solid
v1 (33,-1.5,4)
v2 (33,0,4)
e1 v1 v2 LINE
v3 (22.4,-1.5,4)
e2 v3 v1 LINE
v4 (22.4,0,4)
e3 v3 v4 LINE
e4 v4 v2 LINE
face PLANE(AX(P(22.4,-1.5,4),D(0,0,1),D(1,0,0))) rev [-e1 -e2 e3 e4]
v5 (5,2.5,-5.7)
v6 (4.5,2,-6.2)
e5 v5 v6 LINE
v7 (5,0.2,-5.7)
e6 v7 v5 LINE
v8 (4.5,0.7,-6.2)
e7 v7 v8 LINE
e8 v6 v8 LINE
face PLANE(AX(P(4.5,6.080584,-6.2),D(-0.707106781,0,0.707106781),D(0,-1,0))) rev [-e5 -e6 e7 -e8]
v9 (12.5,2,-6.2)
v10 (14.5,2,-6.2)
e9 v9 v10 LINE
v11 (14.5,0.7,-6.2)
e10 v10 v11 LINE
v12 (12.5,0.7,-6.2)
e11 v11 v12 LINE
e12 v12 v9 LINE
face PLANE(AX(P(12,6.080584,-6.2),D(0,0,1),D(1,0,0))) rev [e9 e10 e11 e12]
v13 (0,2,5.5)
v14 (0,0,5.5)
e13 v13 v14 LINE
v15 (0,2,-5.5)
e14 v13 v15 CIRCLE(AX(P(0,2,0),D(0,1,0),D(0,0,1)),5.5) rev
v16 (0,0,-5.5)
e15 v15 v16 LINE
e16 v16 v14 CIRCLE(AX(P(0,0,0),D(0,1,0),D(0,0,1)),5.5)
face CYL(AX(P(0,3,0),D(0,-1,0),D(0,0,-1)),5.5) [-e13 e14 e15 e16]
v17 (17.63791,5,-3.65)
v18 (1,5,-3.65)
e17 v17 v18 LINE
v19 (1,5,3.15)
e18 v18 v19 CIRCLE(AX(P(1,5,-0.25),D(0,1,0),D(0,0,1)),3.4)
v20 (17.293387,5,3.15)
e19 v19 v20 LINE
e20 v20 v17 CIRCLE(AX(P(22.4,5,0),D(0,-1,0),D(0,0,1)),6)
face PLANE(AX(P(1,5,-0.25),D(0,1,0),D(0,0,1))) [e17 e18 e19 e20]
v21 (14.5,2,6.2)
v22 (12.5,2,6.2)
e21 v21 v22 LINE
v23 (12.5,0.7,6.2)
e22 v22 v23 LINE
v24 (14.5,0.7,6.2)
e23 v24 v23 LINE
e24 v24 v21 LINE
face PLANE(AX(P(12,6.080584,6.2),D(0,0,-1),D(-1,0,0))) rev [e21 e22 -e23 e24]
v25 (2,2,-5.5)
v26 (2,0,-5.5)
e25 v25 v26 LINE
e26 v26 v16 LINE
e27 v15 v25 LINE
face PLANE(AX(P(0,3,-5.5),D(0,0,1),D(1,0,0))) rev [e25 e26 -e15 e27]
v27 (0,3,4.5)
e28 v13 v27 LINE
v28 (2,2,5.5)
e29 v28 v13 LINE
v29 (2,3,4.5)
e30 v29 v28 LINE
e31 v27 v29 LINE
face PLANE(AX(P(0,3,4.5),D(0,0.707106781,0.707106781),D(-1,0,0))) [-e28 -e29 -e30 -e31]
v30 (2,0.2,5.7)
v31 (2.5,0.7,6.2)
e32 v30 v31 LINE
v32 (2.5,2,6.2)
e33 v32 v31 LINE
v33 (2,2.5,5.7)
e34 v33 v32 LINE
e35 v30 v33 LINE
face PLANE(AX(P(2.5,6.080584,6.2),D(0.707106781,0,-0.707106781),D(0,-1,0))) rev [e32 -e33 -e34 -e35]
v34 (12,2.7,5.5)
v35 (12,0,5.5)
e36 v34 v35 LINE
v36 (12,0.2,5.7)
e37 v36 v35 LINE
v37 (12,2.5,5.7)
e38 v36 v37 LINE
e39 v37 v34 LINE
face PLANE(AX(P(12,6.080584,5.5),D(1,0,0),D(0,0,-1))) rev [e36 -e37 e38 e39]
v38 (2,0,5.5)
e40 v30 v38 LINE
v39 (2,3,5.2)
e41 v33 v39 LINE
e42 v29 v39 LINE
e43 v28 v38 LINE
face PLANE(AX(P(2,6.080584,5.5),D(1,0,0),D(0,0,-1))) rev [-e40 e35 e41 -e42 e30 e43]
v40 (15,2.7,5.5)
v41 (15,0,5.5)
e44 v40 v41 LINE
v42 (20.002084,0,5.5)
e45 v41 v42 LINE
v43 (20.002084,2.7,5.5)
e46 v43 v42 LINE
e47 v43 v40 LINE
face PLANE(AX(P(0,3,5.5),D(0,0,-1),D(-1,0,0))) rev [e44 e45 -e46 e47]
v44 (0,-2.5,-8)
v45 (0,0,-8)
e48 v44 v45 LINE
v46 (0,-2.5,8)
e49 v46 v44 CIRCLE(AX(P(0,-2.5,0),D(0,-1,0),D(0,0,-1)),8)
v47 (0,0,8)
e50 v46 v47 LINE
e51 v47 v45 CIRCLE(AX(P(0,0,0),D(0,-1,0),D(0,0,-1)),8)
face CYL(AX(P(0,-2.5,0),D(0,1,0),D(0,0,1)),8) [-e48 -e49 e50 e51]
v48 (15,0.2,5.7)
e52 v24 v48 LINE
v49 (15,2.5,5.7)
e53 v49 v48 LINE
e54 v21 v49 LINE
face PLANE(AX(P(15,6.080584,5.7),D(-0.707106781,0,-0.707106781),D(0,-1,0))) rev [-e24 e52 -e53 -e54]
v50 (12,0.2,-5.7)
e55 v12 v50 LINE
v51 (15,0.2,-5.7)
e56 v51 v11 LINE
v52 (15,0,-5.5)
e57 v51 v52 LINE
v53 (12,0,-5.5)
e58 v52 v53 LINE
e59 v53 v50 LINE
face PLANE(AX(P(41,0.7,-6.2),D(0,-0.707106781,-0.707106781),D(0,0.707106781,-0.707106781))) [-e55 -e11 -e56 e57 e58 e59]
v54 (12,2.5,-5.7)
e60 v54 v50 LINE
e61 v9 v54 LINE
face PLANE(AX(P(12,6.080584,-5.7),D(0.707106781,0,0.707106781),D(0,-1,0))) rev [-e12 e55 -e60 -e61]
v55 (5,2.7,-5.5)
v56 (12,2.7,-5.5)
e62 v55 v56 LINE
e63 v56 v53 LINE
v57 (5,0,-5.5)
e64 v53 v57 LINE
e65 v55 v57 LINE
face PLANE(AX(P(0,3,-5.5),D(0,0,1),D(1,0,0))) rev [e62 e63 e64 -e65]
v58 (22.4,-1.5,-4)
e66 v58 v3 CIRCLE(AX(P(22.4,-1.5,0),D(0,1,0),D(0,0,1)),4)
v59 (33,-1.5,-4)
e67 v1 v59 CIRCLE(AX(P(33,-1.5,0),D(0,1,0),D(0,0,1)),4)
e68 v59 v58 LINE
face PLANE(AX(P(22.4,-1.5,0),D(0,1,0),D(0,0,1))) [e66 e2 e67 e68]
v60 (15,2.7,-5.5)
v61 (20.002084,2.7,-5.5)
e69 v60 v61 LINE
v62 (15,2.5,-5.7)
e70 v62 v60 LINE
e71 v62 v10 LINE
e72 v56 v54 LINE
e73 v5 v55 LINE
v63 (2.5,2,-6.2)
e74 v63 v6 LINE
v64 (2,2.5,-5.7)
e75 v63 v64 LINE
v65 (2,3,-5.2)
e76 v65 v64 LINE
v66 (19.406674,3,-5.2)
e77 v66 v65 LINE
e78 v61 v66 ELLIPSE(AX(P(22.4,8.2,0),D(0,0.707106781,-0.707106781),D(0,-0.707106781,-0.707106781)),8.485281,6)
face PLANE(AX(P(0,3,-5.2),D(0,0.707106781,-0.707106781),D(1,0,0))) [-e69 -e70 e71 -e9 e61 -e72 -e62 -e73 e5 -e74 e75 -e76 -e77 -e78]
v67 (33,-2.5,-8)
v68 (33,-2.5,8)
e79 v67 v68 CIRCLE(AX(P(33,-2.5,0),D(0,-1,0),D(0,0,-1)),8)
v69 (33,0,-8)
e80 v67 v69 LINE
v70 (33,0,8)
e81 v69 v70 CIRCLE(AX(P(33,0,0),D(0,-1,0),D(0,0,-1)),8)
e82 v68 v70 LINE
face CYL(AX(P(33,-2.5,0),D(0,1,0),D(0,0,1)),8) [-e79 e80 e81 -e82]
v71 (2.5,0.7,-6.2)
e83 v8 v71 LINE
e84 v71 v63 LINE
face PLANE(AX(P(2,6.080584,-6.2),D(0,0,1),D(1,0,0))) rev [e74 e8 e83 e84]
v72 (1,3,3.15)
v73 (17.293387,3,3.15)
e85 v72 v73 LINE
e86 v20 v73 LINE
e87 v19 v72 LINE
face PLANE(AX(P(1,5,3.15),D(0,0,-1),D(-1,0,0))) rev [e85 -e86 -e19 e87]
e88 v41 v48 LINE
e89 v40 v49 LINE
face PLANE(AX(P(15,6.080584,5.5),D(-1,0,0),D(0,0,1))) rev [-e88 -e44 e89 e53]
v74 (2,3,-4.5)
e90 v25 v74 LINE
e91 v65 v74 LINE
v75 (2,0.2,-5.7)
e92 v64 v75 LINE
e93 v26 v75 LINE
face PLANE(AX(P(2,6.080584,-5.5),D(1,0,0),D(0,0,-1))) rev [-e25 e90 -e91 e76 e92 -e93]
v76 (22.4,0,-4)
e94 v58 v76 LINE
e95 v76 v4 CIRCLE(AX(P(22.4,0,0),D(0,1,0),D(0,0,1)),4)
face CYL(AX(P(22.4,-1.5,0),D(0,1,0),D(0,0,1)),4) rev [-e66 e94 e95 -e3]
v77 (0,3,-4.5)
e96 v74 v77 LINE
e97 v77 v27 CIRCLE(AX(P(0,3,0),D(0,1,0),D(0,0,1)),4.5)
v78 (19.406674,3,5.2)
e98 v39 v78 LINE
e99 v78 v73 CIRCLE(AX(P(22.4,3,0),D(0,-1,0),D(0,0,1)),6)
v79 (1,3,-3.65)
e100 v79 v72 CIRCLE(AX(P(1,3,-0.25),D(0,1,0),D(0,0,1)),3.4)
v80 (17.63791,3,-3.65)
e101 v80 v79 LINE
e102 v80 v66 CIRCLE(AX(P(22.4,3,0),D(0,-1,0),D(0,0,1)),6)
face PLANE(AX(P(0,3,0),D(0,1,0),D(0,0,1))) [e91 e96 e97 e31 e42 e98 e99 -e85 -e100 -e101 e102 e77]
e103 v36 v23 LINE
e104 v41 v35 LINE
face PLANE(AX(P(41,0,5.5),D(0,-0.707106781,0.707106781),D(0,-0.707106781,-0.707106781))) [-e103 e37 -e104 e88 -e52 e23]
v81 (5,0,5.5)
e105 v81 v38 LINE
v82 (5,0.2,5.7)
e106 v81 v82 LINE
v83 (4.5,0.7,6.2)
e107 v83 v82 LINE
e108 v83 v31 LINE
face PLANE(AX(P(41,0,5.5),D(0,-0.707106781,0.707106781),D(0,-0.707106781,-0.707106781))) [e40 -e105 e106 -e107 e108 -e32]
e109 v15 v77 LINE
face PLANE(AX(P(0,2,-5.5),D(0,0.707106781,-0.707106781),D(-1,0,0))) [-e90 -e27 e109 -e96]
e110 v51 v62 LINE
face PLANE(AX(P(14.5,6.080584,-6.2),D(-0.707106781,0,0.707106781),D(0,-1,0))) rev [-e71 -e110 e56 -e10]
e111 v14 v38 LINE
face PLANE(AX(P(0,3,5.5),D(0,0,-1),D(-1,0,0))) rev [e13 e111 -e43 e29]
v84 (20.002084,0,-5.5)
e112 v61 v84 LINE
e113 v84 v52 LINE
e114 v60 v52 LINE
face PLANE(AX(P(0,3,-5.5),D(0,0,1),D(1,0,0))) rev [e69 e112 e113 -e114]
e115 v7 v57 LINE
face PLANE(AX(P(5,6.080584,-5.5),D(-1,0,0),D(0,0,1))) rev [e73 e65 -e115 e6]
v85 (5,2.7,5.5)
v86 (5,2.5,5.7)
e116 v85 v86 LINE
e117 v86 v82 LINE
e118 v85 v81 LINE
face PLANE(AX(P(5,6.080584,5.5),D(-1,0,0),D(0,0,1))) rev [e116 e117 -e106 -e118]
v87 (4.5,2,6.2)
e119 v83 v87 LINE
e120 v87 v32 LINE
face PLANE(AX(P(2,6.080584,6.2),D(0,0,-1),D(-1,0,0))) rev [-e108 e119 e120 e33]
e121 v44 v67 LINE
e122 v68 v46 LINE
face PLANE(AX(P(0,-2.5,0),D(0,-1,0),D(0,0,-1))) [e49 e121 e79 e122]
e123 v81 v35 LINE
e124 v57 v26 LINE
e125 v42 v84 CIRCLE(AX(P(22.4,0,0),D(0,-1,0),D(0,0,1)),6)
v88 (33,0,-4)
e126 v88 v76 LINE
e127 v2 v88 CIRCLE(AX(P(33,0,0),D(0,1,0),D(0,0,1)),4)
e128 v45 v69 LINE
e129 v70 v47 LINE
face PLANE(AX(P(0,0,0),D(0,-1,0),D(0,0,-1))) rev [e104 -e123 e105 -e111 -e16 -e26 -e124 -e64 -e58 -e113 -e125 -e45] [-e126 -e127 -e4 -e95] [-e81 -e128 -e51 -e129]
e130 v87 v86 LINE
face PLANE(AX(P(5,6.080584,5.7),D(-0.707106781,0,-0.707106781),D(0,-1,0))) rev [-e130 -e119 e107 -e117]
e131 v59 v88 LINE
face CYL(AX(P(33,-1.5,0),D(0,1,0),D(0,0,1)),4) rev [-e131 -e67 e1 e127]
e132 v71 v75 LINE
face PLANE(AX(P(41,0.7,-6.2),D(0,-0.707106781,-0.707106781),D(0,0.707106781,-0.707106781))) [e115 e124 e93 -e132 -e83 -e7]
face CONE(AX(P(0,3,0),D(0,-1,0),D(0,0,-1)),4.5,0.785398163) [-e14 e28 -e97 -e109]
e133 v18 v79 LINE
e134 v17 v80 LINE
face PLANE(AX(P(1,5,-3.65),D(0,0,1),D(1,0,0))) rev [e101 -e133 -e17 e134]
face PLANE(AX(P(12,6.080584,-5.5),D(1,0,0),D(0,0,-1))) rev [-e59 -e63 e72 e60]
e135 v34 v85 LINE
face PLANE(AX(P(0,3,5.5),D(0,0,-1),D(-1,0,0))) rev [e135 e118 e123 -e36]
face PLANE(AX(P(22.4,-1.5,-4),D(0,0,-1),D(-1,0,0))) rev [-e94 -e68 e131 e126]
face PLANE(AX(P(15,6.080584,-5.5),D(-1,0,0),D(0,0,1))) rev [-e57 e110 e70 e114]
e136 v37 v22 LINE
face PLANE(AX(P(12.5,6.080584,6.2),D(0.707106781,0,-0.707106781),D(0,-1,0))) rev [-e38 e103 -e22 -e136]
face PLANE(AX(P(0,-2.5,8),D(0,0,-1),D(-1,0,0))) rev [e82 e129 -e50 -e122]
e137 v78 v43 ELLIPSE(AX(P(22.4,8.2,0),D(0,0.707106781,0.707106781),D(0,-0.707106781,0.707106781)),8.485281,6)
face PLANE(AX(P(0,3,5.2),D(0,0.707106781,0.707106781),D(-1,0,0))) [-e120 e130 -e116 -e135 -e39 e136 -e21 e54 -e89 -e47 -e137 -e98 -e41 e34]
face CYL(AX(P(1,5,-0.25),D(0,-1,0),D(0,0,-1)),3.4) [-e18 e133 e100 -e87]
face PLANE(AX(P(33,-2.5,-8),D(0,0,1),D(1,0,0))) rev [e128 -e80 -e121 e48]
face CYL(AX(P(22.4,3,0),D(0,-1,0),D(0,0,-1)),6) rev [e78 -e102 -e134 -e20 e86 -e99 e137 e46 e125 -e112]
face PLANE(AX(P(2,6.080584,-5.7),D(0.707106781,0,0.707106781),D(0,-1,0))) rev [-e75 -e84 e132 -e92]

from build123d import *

# Parameters (mm, degrees)
EXTRUDE_1_DEPTH          = 3
EXTRUDE_2_DEPTH          = 2.5
CUT_EXTRUDE_1_DEPTH      = 1.5
EXTRUDE_3_DEPTH          = 2
SKETCH_5_W               = 3
SKETCH_5_H               = 0.7
EXTRUDE_4_DEPTH          = 3
CHAMFER_1_SIZE           = 1
CHAMFER_START            = -5.499796234
CHAMFER_2_DEPTH          = 7.499796234
CHAMFER_2_2_ANGLE        = 180
CHAMFER_3_SIZE           = 0.5
CUT_EXTRUDE_2_DEPTH      = 43.071367936
CUT_EXTRUDE_2_DEPTH_BACK = 43.071367936


with BuildPart() as part:
    # 草图1 → 凸台-拉伸1 (new body)
    with BuildSketch(Plane(origin=(0, 0, 0), x_dir=(1, 0, 0), z_dir=(0, 1, 0))):
        with BuildLine():
            Line((0, 5.5), (20.002084238, 5.5))
            ThreePointArc((20.002084238, 5.5), (16.4, 0), (20.002084238, -5.5))
            Line((20.002084238, -5.5), (0, -5.5))
            ThreePointArc((0, -5.5), (-5.5, 0), (0, 5.5))
        make_face()
    extrude(amount=EXTRUDE_1_DEPTH)

    # 草图2 → 凸台-拉伸2 (add)
    with BuildSketch(Plane.XZ):
        with BuildLine():
            Line((0, 8), (33, 8))
            ThreePointArc((33, 8), (41, 0), (33, -8))
            Line((33, -8), (0, -8))
            ThreePointArc((0, -8), (-8, 0), (0, 8))
        make_face()
    extrude(amount=EXTRUDE_2_DEPTH)

    # 草图3 → 切除-拉伸1 (cut)
    with BuildSketch(Plane(origin=(0, 0, 0), x_dir=(1, 0, 0), z_dir=(0, 1, 0))):
        with BuildLine():
            Line((22.4, 4), (33, 4))
            ThreePointArc((33, 4), (37, 0), (33, -4))
            Line((33, -4), (22.4, -4))
            ThreePointArc((22.4, -4), (18.4, 0), (22.4, 4))
        make_face()
    extrude(amount=-CUT_EXTRUDE_1_DEPTH, mode=Mode.SUBTRACT)

    # 草图4 → 凸台-拉伸3 (add)
    with BuildSketch(Plane(origin=(0, 3, 0), x_dir=(1, 0, 0), z_dir=(0, 1, 0))):
        with BuildLine():
            Line((1, 3.65), (17.637910123, 3.65))
            ThreePointArc((17.637910123, 3.65), (16.407686099, 0.30360189), (17.293386641, -3.15))
            Line((17.293386641, -3.15), (1, -3.15))
            ThreePointArc((1, -3.15), (-2.4, 0.25), (1, 3.65))
        make_face()
    extrude(amount=EXTRUDE_3_DEPTH)

    # 草图5 → 凸台-拉伸4 (add)
    with BuildSketch(Plane(origin=(0, 0, 0), x_dir=(1, 0, 0), z_dir=(0, 1, 0))):
        with Locations((3.5, 5.85)):
            Rectangle(SKETCH_5_W, SKETCH_5_H)
        with Locations((13.5, 5.85)):
            Rectangle(SKETCH_5_W, SKETCH_5_H)
        with Locations((13.5, -5.85)):
            Rectangle(SKETCH_5_W, SKETCH_5_H)
        with Locations((3.5, -5.85)):
            Rectangle(SKETCH_5_W, SKETCH_5_H)
    extrude(amount=EXTRUDE_4_DEPTH)

    # 倒角1
    chamfer_1_edges = [part.edges().sort_by_distance(p)[0] for p in [
        (3.5, 3, -6.2),
        (3.5, 3, 6.2),
    ]]
    chamfer(chamfer_1_edges, length=CHAMFER_1_SIZE)

    # 倒角2: read off the stored shape, not the designer's step
    # 倒角2 outline → 倒角2 (cut)
    with BuildSketch(Plane.YZ.offset(CHAMFER_START)):
        Polygon((3, -5.2), (3, -4.5), (2, -5.5), (2.7, -5.5), align=None)
        Polygon((2, 5.5), (3, 4.5), (3, 5.2), (2.7, 5.5), align=None)
    extrude(amount=CHAMFER_2_DEPTH, mode=Mode.SUBTRACT)

    # Chamfer 2 2 outline → Chamfer 2 2 (revolve, cut)
    with BuildSketch(Plane(origin=(0, 0, 0), x_dir=(0, 0, -1), z_dir=(1, 0, 0))):
        Polygon((5.5, 3), (4.5, 3), (5.5, 2), align=None)
    revolve(axis=Axis((0, 0, 0), (0, 1, 0)), revolution_arc=CHAMFER_2_2_ANGLE, mode=Mode.SUBTRACT)

    # 倒角3
    chamfer_3_edges = [part.edges().sort_by_distance(p)[0] for p in [
        (2, 1, -6.2),
        (5, 1, -6.2),
        (12, 1, -6.2),
        (15, 1, -6.2),
        (15, 1, 6.2),
        (12, 1, 6.2),
        (5, 1, 6.2),
        (2, 1, 6.2),
    ]]
    chamfer(chamfer_3_edges, length=CHAMFER_3_SIZE)

    # 草图6 → 切除-拉伸2 (cut, two sides: drawn at the far end of the back side and taken through both)
    with BuildSketch(Plane(origin=(0, 0, 0), x_dir=(0, 0, -1), z_dir=(1, 0, 0)).offset(-CUT_EXTRUDE_2_DEPTH_BACK)):
        Polygon((-5.5, 0), (-6.2, 0.7), (-6.2, 0), align=None)
        Polygon((5.5, 0), (6.2, 0), (6.2, 0.7), align=None)
    extrude(amount=CUT_EXTRUDE_2_DEPTH + CUT_EXTRUDE_2_DEPTH_BACK, mode=Mode.SUBTRACT)


solid = part.part
